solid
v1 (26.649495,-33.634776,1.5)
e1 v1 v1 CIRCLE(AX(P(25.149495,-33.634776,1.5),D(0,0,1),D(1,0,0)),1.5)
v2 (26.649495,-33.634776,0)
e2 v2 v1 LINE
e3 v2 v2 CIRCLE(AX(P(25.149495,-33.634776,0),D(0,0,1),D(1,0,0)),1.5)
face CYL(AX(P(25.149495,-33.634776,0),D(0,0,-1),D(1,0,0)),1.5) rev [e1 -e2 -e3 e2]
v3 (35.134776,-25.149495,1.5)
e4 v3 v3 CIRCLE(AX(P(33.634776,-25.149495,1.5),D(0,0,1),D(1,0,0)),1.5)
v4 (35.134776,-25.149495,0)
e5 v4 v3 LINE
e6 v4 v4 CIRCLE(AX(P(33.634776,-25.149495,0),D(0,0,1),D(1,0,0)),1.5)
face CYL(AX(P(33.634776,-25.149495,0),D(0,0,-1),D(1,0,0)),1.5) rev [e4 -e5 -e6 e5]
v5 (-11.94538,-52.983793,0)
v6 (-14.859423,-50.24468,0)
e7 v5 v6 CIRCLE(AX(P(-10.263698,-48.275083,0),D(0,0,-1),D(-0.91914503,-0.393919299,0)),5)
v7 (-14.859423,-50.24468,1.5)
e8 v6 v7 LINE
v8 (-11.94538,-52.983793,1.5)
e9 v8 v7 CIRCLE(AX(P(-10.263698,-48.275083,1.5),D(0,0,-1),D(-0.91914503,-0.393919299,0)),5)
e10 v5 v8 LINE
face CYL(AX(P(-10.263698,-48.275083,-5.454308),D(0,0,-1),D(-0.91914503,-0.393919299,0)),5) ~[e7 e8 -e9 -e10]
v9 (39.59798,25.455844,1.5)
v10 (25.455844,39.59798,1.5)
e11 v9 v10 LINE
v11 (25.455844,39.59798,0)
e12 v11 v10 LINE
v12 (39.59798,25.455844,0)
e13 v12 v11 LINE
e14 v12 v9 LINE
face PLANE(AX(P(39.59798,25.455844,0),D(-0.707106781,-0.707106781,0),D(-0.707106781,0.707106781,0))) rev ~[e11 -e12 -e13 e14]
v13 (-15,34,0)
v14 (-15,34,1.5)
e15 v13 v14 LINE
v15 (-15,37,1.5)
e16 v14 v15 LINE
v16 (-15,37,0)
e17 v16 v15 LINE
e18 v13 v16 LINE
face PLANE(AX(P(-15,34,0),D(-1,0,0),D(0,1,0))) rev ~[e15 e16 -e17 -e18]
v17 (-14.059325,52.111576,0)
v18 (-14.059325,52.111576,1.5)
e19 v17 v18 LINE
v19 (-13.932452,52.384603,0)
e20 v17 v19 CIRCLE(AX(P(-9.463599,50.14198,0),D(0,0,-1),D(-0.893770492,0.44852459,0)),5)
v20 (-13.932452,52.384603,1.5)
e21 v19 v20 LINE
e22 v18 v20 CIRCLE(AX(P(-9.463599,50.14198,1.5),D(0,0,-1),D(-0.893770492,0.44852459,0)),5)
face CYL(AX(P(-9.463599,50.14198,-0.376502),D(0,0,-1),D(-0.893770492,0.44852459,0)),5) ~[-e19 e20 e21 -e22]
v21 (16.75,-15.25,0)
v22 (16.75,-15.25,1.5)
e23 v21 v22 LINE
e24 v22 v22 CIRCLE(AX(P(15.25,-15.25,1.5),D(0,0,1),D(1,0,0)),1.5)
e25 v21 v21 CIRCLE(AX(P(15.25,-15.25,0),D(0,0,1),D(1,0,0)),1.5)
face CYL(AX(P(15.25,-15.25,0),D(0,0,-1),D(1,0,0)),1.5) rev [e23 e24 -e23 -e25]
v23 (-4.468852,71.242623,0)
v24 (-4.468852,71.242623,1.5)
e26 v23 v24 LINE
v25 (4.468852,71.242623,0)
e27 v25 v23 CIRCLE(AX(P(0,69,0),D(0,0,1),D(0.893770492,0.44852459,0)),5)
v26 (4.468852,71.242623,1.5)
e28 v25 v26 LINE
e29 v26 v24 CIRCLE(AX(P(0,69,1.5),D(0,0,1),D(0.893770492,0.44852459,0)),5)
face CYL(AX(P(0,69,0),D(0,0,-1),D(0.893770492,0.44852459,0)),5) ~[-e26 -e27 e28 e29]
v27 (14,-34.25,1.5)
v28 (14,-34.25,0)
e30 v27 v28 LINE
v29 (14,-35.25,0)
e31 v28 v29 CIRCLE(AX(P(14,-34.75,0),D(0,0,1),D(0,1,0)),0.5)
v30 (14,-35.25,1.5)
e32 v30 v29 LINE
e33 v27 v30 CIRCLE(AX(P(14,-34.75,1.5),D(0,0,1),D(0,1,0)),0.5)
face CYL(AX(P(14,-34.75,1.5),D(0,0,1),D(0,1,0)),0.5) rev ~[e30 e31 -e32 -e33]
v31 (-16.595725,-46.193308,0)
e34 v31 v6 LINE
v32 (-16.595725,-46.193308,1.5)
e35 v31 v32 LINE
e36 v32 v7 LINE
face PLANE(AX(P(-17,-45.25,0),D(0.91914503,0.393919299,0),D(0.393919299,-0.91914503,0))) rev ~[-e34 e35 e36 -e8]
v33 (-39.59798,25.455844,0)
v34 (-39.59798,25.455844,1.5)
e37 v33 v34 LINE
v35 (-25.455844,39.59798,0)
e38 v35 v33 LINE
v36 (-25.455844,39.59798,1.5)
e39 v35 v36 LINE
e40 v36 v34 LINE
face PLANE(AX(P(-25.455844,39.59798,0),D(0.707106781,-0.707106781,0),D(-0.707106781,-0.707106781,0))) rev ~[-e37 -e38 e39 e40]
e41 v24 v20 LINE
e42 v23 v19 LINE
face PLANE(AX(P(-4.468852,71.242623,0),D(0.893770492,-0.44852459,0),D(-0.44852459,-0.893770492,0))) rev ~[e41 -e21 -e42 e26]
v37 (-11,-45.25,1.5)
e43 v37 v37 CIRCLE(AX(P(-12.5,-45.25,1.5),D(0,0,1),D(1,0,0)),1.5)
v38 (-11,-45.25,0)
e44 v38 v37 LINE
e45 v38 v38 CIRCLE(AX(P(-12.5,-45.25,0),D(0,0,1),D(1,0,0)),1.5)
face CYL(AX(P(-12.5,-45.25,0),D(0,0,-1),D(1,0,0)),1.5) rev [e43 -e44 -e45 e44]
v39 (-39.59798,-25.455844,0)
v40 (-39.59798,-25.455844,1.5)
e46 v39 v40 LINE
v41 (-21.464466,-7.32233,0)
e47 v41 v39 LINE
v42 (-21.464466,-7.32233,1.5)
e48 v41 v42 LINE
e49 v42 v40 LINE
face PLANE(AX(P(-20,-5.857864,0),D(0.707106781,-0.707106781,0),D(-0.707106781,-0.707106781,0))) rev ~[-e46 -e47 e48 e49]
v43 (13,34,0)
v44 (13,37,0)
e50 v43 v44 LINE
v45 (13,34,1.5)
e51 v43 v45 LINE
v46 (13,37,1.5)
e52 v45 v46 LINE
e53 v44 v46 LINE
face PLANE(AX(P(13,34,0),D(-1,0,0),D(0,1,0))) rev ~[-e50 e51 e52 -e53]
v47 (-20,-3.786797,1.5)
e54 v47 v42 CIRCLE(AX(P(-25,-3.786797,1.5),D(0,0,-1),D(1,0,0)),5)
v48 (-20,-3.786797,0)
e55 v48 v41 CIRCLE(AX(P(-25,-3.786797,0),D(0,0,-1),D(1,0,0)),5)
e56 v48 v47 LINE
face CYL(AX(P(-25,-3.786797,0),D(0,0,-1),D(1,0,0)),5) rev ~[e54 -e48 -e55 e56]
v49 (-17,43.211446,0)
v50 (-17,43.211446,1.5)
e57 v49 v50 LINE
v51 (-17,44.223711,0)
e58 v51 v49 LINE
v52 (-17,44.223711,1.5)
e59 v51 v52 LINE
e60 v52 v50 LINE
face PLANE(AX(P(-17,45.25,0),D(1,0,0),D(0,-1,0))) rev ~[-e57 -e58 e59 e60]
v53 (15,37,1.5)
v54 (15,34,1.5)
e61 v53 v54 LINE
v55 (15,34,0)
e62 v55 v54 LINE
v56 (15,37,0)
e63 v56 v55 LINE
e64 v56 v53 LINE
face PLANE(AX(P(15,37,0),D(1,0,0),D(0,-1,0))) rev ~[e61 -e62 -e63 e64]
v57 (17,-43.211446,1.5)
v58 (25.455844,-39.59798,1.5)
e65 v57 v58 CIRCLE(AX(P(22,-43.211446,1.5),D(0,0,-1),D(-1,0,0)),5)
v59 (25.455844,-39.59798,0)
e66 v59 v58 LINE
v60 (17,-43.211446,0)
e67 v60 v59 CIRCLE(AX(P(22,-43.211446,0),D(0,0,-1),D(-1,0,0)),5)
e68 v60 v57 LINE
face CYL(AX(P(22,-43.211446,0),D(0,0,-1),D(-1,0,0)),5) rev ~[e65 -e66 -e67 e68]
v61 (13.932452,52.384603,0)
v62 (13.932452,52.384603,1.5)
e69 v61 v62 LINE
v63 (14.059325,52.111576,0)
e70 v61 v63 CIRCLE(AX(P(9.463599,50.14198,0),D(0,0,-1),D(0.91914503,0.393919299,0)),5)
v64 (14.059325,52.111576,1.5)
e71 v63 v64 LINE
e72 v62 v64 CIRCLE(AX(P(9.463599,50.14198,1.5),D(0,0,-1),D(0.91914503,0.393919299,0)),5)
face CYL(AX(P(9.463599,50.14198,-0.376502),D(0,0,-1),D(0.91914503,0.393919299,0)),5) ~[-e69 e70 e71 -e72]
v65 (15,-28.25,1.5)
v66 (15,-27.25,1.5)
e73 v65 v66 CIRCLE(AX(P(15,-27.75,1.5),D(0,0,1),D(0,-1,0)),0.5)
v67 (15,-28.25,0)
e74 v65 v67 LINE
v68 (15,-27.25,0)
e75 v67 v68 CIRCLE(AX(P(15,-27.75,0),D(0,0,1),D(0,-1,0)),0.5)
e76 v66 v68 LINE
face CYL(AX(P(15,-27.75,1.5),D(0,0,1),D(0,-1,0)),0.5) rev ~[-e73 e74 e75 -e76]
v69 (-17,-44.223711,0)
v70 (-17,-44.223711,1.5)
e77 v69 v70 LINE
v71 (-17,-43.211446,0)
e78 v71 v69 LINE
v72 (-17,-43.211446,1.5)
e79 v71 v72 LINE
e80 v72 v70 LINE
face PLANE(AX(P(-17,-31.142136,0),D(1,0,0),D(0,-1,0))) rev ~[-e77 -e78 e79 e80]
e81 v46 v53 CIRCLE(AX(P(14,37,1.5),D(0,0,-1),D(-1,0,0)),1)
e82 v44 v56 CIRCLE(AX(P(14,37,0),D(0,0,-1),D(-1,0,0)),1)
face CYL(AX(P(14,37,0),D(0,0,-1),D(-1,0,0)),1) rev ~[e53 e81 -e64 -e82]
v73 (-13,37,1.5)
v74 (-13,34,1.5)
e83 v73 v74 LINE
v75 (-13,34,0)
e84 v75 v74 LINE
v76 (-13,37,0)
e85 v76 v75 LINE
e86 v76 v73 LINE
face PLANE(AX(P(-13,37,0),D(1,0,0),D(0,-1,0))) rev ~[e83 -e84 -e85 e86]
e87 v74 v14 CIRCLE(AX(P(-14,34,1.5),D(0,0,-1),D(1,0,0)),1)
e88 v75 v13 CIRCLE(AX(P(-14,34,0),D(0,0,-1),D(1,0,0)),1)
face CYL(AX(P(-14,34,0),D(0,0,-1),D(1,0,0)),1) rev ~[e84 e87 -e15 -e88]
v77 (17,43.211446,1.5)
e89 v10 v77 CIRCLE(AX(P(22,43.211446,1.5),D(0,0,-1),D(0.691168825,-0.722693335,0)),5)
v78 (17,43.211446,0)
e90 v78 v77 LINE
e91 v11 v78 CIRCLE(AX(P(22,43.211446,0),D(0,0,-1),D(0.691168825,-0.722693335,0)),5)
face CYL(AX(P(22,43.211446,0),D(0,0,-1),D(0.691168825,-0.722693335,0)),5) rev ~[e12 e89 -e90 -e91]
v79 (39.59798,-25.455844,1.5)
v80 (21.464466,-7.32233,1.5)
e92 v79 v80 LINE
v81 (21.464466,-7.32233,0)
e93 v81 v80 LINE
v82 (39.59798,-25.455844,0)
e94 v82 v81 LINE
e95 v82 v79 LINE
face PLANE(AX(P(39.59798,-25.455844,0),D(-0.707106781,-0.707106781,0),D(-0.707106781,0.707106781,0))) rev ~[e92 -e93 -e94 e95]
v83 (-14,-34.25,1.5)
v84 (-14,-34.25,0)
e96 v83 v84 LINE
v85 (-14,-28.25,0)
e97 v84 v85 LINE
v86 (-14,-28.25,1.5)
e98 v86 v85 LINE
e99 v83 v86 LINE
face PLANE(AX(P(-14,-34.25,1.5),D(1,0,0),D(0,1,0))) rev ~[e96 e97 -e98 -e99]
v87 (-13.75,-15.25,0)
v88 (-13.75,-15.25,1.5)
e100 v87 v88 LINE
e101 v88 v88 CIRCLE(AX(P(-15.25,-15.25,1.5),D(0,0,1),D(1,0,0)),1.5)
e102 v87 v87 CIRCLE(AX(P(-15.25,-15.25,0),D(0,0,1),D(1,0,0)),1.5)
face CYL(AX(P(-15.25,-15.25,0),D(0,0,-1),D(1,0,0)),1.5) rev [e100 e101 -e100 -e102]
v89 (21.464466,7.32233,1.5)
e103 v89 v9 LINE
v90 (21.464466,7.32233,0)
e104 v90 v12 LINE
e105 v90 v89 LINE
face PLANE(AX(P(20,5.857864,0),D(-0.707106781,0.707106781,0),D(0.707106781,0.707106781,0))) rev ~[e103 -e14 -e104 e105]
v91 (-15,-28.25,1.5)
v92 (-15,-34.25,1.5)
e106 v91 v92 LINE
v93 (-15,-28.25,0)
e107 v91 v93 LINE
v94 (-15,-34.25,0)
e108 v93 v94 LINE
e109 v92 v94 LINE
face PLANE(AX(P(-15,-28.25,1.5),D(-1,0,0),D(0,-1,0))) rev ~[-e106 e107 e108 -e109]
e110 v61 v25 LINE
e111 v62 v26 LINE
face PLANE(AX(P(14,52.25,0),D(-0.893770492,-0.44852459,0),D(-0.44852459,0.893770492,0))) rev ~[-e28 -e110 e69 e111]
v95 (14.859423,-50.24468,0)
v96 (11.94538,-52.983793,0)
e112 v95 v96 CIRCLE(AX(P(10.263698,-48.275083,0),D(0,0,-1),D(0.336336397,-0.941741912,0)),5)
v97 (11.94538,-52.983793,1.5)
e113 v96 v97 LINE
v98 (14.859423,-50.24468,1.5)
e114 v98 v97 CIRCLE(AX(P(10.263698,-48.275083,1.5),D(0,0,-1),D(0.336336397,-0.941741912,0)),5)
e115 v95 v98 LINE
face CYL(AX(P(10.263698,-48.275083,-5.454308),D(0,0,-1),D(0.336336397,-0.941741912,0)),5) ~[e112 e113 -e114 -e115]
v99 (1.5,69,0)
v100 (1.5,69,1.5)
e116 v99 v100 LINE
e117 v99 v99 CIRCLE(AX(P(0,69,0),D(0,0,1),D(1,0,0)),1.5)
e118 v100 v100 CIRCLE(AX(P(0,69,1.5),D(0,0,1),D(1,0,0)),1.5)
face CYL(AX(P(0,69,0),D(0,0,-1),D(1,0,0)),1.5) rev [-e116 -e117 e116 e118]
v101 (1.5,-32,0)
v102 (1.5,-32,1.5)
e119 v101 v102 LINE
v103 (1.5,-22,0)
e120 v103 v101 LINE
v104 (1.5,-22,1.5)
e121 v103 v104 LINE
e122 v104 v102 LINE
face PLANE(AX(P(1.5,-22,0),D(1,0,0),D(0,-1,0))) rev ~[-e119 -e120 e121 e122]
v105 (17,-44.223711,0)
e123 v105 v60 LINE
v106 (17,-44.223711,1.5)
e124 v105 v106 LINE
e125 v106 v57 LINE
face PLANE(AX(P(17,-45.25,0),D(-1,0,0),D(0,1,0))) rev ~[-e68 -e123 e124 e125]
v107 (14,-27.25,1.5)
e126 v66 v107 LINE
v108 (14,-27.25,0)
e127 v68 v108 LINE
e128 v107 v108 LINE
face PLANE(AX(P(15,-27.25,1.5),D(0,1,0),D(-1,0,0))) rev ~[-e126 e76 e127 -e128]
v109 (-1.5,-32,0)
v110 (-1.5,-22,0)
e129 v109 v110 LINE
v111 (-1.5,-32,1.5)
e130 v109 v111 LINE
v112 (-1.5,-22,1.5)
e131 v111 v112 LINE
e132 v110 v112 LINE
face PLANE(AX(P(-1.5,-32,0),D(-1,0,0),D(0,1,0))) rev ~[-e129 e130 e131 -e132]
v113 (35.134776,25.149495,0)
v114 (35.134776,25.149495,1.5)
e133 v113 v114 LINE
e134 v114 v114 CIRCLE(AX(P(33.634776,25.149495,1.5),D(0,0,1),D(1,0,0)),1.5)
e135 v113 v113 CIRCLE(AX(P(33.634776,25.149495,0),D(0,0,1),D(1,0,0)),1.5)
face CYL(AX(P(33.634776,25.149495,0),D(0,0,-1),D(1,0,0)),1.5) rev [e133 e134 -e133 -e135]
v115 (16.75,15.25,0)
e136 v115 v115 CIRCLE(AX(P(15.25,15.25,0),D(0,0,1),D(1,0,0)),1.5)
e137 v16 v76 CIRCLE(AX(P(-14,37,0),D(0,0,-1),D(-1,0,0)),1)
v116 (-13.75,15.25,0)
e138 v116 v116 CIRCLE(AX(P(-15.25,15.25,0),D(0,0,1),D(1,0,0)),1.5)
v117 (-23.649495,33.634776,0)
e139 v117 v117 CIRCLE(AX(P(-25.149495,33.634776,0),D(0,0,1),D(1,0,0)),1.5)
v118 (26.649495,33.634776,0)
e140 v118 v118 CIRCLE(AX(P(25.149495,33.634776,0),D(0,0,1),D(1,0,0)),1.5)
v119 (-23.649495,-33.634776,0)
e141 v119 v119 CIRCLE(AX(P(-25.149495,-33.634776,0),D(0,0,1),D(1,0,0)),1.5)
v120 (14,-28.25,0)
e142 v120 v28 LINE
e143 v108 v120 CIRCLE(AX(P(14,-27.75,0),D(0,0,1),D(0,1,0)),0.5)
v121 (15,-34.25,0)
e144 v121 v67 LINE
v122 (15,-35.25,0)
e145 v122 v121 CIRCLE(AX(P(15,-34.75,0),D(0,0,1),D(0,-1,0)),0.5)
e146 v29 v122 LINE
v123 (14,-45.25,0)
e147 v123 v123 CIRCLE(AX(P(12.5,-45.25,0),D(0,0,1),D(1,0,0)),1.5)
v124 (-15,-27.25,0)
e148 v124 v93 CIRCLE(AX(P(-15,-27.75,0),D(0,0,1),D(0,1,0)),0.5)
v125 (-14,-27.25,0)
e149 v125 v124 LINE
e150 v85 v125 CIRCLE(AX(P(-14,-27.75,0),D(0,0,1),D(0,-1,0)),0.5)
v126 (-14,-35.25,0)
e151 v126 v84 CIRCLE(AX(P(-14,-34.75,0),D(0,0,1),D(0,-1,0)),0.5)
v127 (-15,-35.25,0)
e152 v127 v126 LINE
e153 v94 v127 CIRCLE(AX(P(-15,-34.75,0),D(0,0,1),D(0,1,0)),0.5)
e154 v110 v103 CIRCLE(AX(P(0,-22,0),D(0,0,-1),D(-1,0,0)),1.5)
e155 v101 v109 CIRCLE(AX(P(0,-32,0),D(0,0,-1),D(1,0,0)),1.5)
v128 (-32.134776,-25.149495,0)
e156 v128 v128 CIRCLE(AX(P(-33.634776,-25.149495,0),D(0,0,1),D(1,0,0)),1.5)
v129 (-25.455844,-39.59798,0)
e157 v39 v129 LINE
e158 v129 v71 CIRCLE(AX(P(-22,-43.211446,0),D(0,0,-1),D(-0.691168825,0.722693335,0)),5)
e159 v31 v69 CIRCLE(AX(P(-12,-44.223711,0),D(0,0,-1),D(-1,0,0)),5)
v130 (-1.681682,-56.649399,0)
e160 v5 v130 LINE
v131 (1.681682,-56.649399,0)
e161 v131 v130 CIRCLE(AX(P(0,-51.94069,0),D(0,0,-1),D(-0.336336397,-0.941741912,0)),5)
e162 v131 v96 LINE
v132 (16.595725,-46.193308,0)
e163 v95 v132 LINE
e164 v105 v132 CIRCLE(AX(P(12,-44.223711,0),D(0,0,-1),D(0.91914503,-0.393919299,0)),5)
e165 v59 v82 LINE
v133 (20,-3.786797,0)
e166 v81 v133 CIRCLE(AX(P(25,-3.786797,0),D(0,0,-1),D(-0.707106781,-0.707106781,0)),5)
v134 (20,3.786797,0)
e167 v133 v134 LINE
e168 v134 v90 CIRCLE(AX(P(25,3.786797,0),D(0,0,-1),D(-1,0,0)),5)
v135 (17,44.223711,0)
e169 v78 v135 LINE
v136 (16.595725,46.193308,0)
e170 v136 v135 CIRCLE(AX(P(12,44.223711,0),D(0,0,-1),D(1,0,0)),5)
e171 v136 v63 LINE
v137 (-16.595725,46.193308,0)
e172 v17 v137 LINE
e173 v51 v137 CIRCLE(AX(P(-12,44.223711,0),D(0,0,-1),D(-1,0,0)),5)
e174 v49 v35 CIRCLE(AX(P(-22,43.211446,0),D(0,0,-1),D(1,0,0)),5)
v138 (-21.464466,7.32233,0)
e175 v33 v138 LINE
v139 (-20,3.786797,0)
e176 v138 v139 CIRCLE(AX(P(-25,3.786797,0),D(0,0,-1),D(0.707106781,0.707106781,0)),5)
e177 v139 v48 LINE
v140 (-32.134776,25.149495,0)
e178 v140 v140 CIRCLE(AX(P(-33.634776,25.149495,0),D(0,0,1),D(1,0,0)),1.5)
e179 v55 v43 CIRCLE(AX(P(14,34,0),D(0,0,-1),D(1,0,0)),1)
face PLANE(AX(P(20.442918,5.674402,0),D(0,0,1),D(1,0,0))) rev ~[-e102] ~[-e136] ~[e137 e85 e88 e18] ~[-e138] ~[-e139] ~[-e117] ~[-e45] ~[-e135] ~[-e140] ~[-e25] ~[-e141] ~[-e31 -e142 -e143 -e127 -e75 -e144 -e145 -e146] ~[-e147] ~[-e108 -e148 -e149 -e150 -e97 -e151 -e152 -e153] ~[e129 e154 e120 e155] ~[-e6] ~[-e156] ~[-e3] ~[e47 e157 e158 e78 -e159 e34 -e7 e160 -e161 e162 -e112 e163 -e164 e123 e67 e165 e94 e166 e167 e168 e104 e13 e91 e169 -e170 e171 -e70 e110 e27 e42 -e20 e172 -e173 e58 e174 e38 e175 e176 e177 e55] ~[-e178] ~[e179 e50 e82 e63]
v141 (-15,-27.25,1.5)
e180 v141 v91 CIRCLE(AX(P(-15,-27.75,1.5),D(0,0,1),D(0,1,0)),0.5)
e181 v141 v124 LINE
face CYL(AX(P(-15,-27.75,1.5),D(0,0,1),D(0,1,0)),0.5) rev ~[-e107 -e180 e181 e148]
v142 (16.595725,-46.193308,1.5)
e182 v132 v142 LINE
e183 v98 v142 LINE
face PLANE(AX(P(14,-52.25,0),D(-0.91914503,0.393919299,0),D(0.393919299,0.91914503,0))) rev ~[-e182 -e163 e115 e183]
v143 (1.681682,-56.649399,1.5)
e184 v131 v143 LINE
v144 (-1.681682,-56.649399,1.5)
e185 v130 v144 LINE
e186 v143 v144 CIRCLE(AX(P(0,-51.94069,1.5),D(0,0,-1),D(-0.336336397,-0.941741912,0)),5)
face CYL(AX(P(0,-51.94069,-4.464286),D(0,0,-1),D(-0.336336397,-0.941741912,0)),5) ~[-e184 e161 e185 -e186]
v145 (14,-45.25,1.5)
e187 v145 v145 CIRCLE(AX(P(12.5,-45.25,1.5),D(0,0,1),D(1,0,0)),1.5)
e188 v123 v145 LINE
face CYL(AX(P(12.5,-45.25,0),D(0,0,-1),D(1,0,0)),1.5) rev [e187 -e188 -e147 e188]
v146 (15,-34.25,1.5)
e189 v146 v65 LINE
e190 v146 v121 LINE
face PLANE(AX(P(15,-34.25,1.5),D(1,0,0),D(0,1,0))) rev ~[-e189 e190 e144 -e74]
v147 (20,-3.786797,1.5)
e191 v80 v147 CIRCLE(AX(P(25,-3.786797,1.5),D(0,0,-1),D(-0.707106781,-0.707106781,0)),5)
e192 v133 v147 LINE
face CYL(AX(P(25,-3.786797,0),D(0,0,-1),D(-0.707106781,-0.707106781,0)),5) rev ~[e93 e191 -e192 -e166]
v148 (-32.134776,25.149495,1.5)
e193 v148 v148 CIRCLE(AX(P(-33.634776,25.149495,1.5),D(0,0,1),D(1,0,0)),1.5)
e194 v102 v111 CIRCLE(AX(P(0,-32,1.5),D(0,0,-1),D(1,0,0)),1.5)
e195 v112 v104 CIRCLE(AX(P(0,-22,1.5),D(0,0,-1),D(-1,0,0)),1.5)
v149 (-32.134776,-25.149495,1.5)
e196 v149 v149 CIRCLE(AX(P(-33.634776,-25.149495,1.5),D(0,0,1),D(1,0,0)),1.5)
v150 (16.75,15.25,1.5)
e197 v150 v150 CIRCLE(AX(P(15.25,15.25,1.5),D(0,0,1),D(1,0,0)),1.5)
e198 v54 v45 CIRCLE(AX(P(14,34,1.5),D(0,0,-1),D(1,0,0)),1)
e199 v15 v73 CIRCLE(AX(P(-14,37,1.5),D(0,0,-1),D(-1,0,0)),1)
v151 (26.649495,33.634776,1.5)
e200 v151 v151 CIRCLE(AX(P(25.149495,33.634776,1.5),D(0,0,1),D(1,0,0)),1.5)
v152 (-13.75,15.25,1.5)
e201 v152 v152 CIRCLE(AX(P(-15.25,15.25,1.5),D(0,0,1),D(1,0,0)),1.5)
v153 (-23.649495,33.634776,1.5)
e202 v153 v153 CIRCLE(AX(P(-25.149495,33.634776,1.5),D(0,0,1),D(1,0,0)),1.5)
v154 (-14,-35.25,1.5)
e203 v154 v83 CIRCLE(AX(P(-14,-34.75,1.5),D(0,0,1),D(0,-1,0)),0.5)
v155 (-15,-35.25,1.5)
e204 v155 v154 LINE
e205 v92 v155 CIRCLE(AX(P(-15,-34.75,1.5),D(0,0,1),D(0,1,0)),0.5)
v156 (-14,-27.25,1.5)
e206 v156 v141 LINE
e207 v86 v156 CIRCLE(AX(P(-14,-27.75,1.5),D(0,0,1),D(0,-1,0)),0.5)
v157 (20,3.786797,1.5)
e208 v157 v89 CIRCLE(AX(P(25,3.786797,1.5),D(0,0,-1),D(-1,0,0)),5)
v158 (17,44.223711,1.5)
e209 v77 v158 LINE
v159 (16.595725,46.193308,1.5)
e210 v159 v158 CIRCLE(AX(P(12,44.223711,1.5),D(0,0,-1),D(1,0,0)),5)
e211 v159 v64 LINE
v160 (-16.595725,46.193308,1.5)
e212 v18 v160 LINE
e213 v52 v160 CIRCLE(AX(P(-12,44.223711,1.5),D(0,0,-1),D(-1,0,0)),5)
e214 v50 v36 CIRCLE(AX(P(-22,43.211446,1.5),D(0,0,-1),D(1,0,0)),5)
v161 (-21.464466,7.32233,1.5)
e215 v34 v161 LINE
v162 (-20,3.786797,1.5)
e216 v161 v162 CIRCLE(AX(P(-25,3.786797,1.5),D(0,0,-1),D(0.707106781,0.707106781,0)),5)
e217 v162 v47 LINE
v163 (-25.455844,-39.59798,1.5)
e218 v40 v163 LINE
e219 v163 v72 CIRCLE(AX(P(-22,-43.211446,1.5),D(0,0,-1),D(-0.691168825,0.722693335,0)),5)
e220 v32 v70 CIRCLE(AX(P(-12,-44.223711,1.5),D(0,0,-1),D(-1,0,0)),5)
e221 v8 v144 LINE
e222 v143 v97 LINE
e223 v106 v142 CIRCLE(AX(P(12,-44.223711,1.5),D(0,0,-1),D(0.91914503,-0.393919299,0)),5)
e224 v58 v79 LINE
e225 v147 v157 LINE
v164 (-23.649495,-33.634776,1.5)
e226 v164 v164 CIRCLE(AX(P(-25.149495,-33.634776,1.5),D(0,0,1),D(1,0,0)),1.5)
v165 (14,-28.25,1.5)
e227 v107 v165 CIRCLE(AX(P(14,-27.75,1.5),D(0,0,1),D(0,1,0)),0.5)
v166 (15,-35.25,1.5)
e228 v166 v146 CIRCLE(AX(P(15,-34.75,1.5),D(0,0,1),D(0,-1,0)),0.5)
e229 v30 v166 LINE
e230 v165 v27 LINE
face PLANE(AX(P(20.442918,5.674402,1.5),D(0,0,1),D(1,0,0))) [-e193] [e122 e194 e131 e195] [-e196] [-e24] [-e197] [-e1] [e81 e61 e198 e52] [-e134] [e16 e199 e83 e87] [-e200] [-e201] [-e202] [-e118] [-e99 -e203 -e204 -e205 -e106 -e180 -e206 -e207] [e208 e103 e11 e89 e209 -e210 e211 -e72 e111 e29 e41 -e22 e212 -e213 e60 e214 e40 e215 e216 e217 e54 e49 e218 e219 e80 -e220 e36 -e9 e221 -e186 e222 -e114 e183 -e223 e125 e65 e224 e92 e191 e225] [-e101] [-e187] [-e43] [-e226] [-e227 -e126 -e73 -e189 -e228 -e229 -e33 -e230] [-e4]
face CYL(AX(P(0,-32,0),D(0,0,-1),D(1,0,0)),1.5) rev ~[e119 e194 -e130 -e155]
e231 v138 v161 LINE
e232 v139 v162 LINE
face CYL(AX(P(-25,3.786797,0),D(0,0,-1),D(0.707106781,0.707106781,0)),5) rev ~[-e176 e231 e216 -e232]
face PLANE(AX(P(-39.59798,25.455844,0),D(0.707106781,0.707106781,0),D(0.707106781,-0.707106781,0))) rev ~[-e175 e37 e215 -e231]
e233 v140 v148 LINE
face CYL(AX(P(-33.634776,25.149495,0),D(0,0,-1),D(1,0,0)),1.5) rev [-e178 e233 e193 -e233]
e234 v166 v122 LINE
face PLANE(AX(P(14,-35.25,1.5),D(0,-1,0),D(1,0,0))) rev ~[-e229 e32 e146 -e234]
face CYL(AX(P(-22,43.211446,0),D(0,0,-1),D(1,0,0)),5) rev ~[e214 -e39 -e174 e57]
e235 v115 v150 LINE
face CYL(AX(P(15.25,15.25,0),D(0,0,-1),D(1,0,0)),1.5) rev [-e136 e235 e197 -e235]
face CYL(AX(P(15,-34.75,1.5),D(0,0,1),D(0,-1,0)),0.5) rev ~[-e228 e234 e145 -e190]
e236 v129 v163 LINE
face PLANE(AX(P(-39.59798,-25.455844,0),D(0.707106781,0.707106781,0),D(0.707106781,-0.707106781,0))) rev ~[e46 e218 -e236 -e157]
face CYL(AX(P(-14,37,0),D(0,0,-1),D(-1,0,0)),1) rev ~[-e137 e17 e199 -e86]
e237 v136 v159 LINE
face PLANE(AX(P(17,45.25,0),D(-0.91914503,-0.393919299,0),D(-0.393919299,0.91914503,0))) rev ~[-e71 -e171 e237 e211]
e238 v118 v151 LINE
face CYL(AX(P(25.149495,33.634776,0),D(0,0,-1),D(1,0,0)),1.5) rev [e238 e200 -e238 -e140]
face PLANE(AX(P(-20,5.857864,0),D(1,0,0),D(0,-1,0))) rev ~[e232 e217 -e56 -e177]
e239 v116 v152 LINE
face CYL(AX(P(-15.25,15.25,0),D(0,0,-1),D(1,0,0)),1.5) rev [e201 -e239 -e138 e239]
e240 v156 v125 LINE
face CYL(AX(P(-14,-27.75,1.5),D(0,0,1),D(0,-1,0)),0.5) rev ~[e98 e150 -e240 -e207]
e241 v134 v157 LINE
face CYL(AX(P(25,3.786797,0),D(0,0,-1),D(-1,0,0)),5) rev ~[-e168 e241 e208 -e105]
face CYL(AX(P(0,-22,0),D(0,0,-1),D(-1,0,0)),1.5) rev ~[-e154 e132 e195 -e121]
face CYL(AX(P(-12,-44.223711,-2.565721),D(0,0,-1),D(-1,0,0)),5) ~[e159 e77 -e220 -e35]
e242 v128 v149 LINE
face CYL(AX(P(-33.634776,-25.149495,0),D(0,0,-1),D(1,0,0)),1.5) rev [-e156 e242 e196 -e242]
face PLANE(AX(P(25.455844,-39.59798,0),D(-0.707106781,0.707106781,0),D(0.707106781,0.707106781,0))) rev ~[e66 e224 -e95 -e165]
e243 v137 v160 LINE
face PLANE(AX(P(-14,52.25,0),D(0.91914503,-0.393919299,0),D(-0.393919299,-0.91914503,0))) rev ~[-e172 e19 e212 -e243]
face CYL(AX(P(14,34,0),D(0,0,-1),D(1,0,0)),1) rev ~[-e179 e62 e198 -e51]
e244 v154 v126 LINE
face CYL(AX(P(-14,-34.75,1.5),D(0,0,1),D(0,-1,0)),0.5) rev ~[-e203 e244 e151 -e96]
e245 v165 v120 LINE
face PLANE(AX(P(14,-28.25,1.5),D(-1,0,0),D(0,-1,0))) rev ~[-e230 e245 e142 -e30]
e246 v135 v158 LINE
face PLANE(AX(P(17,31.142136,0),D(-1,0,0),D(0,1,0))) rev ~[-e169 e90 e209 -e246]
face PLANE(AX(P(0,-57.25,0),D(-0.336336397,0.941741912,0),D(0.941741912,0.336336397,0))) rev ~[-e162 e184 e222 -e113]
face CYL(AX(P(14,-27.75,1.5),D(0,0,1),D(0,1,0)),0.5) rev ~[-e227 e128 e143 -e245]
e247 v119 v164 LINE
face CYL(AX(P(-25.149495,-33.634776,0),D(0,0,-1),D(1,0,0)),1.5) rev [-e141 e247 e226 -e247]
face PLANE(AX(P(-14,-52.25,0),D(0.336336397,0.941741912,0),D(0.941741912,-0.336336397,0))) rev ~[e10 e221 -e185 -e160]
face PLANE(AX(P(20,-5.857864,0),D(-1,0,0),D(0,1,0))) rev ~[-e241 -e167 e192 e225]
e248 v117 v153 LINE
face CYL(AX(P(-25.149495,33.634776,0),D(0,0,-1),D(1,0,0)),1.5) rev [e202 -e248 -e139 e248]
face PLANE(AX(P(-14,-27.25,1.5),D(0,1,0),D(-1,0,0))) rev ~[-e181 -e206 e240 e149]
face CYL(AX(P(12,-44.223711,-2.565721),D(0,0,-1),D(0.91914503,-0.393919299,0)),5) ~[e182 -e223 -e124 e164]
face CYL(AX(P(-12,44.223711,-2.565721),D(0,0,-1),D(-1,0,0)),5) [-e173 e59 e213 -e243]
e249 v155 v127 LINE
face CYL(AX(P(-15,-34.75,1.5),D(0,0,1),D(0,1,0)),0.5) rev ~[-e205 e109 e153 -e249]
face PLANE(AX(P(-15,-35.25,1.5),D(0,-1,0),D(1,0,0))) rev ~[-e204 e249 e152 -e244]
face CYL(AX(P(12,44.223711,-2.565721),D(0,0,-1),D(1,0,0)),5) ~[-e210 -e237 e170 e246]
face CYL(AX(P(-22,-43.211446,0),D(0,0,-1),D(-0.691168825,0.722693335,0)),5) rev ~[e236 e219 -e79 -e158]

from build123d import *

# Parameters (mm, degrees)
F0_R        = 1.5
F1_DEPTH    = 1.5
F2_T1_DEPTH = 1.5
F3_T1_DEPTH = 1.5
F3_T3_DEPTH = 6.6314425489
F3_T5_DEPTH = 12.4086164325
F3_T7_DEPTH = 10.4285714286
F3_T9_DEPTH = 2.253003807
F5_DEPTH    = 25


# Not quite as in the source:
# - a fillet or chamfer that OpenCascade refuses, or shapes differently, is made with other operations: its cross-section is extruded or revolved along the edge and cut away or added


with BuildPart() as f1:
    # F0 (on Top) → F1 (new body)
    with BuildSketch(Plane.XY):
        with BuildLine():
            Line((-25.4558441227, 39.5979797464), (-39.5979797464, 25.4558441227))
            Line((-39.5979797464, 25.4558441227), (-20, 5.8578643763))
            Line((-20, 5.8578643763), (-20, -5.8578643763))
            Line((-20, -5.8578643763), (-39.5979797464, -25.4558441227))
            Line((-39.5979797464, -25.4558441227), (-25.4558441227, -39.5979797464))
            Line((-25.4558441227, -39.5979797464), (-17, -31.1421356237))
            Line((-17, -31.1421356237), (-17, -45.25))
            Line((-17, -45.25), (-14, -52.25))
            Line((-14, -52.25), (0, -57.25))
            Line((0, -57.25), (14, -52.25))
            Line((14, -52.25), (17, -45.25))
            Line((17, -45.25), (17, -31.1421356237))
            Line((17, -31.1421356237), (25.4558441227, -39.5979797464))
            Line((25.4558441227, -39.5979797464), (39.5979797464, -25.4558441227))
            Line((39.5979797464, -25.4558441227), (20, -5.8578643763))
            Line((20, -5.8578643763), (20, 5.8578643763))
            Line((20, 5.8578643763), (39.5979797464, 25.4558441227))
            Line((39.5979797464, 25.4558441227), (25.4558441227, 39.5979797464))
            Line((25.4558441227, 39.5979797464), (17, 31.1421356237))
            Line((17, 31.1421356237), (17, 45.25))
            Line((17, 45.25), (14, 52.25))
            Line((14, 52.25), (4.468852459, 71.2426229508))
            ThreePointArc((4.468852459, 71.2426229508), (0, 74), (-4.468852459, 71.2426229508))
            Line((-4.468852459, 71.2426229508), (-14, 52.25))
            Line((-14, 52.25), (-17, 45.25))
            Line((-17, 45.25), (-17, 31.1421356237))
            Line((-17, 31.1421356237), (-25.4558441227, 39.5979797464))
        make_face()
        with Locations((-33.6347763109, -25.1494949366)):
            Circle(F0_R, mode=Mode.SUBTRACT)
        with Locations((-25.1494949366, -33.6347763109)):
            Circle(F0_R, mode=Mode.SUBTRACT)
        with Locations((-12.5, -45.25)):
            Circle(F0_R, mode=Mode.SUBTRACT)
        with BuildLine():
            ThreePointArc((-1.5, -22), (0, -20.5), (1.5, -22))
            Line((1.5, -22), (1.5, -32))
            ThreePointArc((1.5, -32), (0, -33.5), (-1.5, -32))
            Line((-1.5, -32), (-1.5, -22))
        make_face(mode=Mode.SUBTRACT)
        with Locations((-15.25, -15.25)):
            Circle(F0_R, mode=Mode.SUBTRACT)
        with Locations((12.5, -45.25)):
            Circle(F0_R, mode=Mode.SUBTRACT)
        with Locations((25.1494949366, -33.6347763109)):
            Circle(F0_R, mode=Mode.SUBTRACT)
        with Locations((33.6347763109, -25.1494949366)):
            Circle(F0_R, mode=Mode.SUBTRACT)
        with Locations((15.25, -15.25)):
            Circle(F0_R, mode=Mode.SUBTRACT)
        with Locations((-33.6347763109, 25.1494949366)):
            Circle(F0_R, mode=Mode.SUBTRACT)
        with Locations((-25.1494949366, 33.6347763109)):
            Circle(F0_R, mode=Mode.SUBTRACT)
        with Locations((-15.25, 15.25)):
            Circle(F0_R, mode=Mode.SUBTRACT)
        with BuildLine():
            Line((-15, 34), (-15, 37))
            ThreePointArc((-15, 37), (-14, 38), (-13, 37))
            Line((-13, 37), (-13, 34))
            ThreePointArc((-13, 34), (-14, 33), (-15, 34))
        make_face(mode=Mode.SUBTRACT)
        with Locations((0, 69)):
            Circle(F0_R, mode=Mode.SUBTRACT)
        with Locations((15.25, 15.25)):
            Circle(F0_R, mode=Mode.SUBTRACT)
        with BuildLine():
            ThreePointArc((13, 37), (14, 38), (15, 37))
            Line((15, 37), (15, 34))
            ThreePointArc((15, 34), (14, 33), (13, 34))
            Line((13, 34), (13, 37))
        make_face(mode=Mode.SUBTRACT)
        with Locations((25.1494949366, 33.6347763109)):
            Circle(F0_R, mode=Mode.SUBTRACT)
        with Locations((33.6347763109, 25.1494949366)):
            Circle(F0_R, mode=Mode.SUBTRACT)
    extrude(amount=F1_DEPTH)

    # F2: fillet of radius 5 on 4 edges, made by hand

    # F2_s2 → F2_t1 (join)
    with BuildSketch(Plane.XY):
        with BuildLine():
            ThreePointArc((17, -43.2114464198), (20.0352125578, -38.613663225), (25.4558441227, -39.5979797464))
            Line((25.4558441227, -39.5979797464), (17, -31.1421356237))
            Line((17, -31.1421356237), (17, -43.2114464198))
        make_face()
        with BuildLine():
            ThreePointArc((-25.4558441227, -39.5979797464), (-20.0352125578, -38.613663225), (-17, -43.2114464198))
            Line((-17, -43.2114464198), (-17, -31.1421356237))
            Line((-17, -31.1421356237), (-25.4558441227, -39.5979797464))
        make_face()
        with BuildLine():
            ThreePointArc((-17, 43.2114464198), (-20.0352125578, 38.613663225), (-25.4558441227, 39.5979797464))
            Line((-25.4558441227, 39.5979797464), (-17, 31.1421356237))
            Line((-17, 31.1421356237), (-17, 43.2114464198))
        make_face()
        with BuildLine():
            ThreePointArc((25.4558441227, 39.5979797464), (20.0352125578, 38.613663225), (17, 43.2114464198))
            Line((17, 43.2114464198), (17, 31.1421356237))
            Line((17, 31.1421356237), (25.4558441227, 39.5979797464))
        make_face()
    extrude(amount=F2_T1_DEPTH)

    # F3: fillet of radius 5 on 13 edges, made by hand

    # F3_s2 → F3_t1 (join)
    with BuildSketch(Plane.XY):
        with BuildLine():
            ThreePointArc((20, 3.7867965644), (20.3806023374, 5.7002137262), (21.4644660941, 7.3223304703))
            Line((21.4644660941, 7.3223304703), (20, 5.8578643763))
            Line((20, 5.8578643763), (20, 3.7867965644))
        make_face()
        with BuildLine():
            ThreePointArc((21.4644660941, -7.3223304703), (20.3806023374, -5.7002137262), (20, -3.7867965644))
            Line((20, -3.7867965644), (20, -5.8578643763))
            Line((20, -5.8578643763), (21.4644660941, -7.3223304703))
        make_face()
        with BuildLine():
            ThreePointArc((-20, -3.7867965644), (-20.3806023374, -5.7002137262), (-21.4644660941, -7.3223304703))
            Line((-21.4644660941, -7.3223304703), (-20, -5.8578643763))
            Line((-20, -5.8578643763), (-20, -3.7867965644))
        make_face()
        with BuildLine():
            ThreePointArc((-21.4644660941, 7.3223304703), (-20.3806023374, 5.7002137262), (-20, 3.7867965644))
            Line((-20, 3.7867965644), (-20, 5.8578643763))
            Line((-20, 5.8578643763), (-21.4644660941, 7.3223304703))
        make_face()
    extrude(amount=F3_T1_DEPTH)

    # F3_s4 → F3_t3 (cut)
    with BuildSketch(Plane.XY.offset(-2.5657212744)):
        with BuildLine():
            ThreePointArc((16.5957251501, -46.1933079831), (16.897888614, -45.2290408516), (17, -44.2237114902))
            Line((17, -44.2237114902), (17, -45.25))
            Line((17, -45.25), (16.5957251501, -46.1933079831))
        make_face()
        with BuildLine():
            ThreePointArc((-17, -44.2237114902), (-16.897888614, -45.2290408516), (-16.5957251501, -46.1933079831))
            Line((-16.5957251501, -46.1933079831), (-17, -45.25))
            Line((-17, -45.25), (-17, -44.2237114902))
        make_face()
        with BuildLine():
            ThreePointArc((-17, 44.2237114902), (-16.897888614, 45.2290408516), (-16.5957251501, 46.1933079831))
            Line((-16.5957251501, 46.1933079831), (-17, 45.25))
            Line((-17, 45.25), (-17, 44.2237114902))
        make_face()
        with BuildLine():
            ThreePointArc((17, 44.2237114902), (16.897888614, 45.2290408516), (16.5957251501, 46.1933079831))
            Line((16.5957251501, 46.1933079831), (17, 45.25))
            Line((17, 45.25), (17, 44.2237114902))
        make_face()
    extrude(amount=F3_T3_DEPTH, mode=Mode.SUBTRACT)

    # F3_s6 → F3_t5 (cut)
    with BuildSketch(Plane.XY.offset(-5.4543082162)):
        with BuildLine():
            ThreePointArc((11.9453797416, -52.9837929494), (13.6881897161, -51.9182763344), (14.8594229067, -50.2446798843))
            Line((14.8594229067, -50.2446798843), (14, -52.25))
            Line((14, -52.25), (11.9453797416, -52.9837929494))
        make_face()
        with BuildLine():
            ThreePointArc((-14.8594229067, -50.2446798843), (-13.6881897161, -51.9182763344), (-11.9453797416, -52.9837929494))
            Line((-11.9453797416, -52.9837929494), (-14, -52.25))
            Line((-14, -52.25), (-14.8594229067, -50.2446798843))
        make_face()
    extrude(amount=F3_T5_DEPTH, mode=Mode.SUBTRACT)

    # F3_s8 → F3_t7 (cut)
    with BuildSketch(Plane.XY.offset(-4.4642857143)):
        with BuildLine():
            ThreePointArc((-1.681681985, -56.6493992911), (0, -56.9406897331), (1.681681985, -56.6493992911))
            Line((1.681681985, -56.6493992911), (0, -57.25))
            Line((0, -57.25), (-1.681681985, -56.6493992911))
        make_face()
    extrude(amount=F3_T7_DEPTH, mode=Mode.SUBTRACT)

    # F3_s10 → F3_t9 (cut)
    with BuildSketch(Plane.XY.offset(-0.3765019035)):
        with BuildLine():
            ThreePointArc((-13.9324518552, 52.3846025166), (-13.9979436343, 52.2490444272), (-14.0593245463, 52.1115760587))
            Line((-14.0593245463, 52.1115760587), (-14, 52.25))
            Line((-14, 52.25), (-13.9324518552, 52.3846025166))
        make_face()
        with BuildLine():
            ThreePointArc((14.0593245463, 52.1115760587), (13.9979436343, 52.2490444272), (13.9324518552, 52.3846025166))
            Line((13.9324518552, 52.3846025166), (14, 52.25))
            Line((14, 52.25), (14.0593245463, 52.1115760587))
        make_face()
    extrude(amount=F3_T9_DEPTH, mode=Mode.SUBTRACT)

    # F4 (on face) → F5 (cut)
    with BuildSketch(Plane.XY.offset(1.5)):
        with BuildLine():
            Line((-14, -27.25), (-15, -27.25))
            ThreePointArc((-15, -27.25), (-15.5, -27.75), (-15, -28.25))
            Line((-15, -28.25), (-15, -34.25))
            ThreePointArc((-15, -34.25), (-15.5, -34.75), (-15, -35.25))
            Line((-15, -35.25), (-14, -35.25))
            ThreePointArc((-14, -35.25), (-13.5, -34.75), (-14, -34.25))
            Line((-14, -34.25), (-14, -28.25))
            ThreePointArc((-14, -28.25), (-13.5, -27.75), (-14, -27.25))
        make_face()
        with BuildLine():
            ThreePointArc((15, -28.25), (15.5, -27.75), (15, -27.25))
            Line((15, -27.25), (14, -27.25))
            ThreePointArc((14, -27.25), (13.5, -27.75), (14, -28.25))
            Line((14, -28.25), (14, -34.25))
            ThreePointArc((14, -34.25), (13.5, -34.75), (14, -35.25))
            Line((14, -35.25), (15, -35.25))
            ThreePointArc((15, -35.25), (15.5, -34.75), (15, -34.25))
            Line((15, -34.25), (15, -28.25))
        make_face()
    extrude(amount=-F5_DEPTH, mode=Mode.SUBTRACT)


solid = f1.part
